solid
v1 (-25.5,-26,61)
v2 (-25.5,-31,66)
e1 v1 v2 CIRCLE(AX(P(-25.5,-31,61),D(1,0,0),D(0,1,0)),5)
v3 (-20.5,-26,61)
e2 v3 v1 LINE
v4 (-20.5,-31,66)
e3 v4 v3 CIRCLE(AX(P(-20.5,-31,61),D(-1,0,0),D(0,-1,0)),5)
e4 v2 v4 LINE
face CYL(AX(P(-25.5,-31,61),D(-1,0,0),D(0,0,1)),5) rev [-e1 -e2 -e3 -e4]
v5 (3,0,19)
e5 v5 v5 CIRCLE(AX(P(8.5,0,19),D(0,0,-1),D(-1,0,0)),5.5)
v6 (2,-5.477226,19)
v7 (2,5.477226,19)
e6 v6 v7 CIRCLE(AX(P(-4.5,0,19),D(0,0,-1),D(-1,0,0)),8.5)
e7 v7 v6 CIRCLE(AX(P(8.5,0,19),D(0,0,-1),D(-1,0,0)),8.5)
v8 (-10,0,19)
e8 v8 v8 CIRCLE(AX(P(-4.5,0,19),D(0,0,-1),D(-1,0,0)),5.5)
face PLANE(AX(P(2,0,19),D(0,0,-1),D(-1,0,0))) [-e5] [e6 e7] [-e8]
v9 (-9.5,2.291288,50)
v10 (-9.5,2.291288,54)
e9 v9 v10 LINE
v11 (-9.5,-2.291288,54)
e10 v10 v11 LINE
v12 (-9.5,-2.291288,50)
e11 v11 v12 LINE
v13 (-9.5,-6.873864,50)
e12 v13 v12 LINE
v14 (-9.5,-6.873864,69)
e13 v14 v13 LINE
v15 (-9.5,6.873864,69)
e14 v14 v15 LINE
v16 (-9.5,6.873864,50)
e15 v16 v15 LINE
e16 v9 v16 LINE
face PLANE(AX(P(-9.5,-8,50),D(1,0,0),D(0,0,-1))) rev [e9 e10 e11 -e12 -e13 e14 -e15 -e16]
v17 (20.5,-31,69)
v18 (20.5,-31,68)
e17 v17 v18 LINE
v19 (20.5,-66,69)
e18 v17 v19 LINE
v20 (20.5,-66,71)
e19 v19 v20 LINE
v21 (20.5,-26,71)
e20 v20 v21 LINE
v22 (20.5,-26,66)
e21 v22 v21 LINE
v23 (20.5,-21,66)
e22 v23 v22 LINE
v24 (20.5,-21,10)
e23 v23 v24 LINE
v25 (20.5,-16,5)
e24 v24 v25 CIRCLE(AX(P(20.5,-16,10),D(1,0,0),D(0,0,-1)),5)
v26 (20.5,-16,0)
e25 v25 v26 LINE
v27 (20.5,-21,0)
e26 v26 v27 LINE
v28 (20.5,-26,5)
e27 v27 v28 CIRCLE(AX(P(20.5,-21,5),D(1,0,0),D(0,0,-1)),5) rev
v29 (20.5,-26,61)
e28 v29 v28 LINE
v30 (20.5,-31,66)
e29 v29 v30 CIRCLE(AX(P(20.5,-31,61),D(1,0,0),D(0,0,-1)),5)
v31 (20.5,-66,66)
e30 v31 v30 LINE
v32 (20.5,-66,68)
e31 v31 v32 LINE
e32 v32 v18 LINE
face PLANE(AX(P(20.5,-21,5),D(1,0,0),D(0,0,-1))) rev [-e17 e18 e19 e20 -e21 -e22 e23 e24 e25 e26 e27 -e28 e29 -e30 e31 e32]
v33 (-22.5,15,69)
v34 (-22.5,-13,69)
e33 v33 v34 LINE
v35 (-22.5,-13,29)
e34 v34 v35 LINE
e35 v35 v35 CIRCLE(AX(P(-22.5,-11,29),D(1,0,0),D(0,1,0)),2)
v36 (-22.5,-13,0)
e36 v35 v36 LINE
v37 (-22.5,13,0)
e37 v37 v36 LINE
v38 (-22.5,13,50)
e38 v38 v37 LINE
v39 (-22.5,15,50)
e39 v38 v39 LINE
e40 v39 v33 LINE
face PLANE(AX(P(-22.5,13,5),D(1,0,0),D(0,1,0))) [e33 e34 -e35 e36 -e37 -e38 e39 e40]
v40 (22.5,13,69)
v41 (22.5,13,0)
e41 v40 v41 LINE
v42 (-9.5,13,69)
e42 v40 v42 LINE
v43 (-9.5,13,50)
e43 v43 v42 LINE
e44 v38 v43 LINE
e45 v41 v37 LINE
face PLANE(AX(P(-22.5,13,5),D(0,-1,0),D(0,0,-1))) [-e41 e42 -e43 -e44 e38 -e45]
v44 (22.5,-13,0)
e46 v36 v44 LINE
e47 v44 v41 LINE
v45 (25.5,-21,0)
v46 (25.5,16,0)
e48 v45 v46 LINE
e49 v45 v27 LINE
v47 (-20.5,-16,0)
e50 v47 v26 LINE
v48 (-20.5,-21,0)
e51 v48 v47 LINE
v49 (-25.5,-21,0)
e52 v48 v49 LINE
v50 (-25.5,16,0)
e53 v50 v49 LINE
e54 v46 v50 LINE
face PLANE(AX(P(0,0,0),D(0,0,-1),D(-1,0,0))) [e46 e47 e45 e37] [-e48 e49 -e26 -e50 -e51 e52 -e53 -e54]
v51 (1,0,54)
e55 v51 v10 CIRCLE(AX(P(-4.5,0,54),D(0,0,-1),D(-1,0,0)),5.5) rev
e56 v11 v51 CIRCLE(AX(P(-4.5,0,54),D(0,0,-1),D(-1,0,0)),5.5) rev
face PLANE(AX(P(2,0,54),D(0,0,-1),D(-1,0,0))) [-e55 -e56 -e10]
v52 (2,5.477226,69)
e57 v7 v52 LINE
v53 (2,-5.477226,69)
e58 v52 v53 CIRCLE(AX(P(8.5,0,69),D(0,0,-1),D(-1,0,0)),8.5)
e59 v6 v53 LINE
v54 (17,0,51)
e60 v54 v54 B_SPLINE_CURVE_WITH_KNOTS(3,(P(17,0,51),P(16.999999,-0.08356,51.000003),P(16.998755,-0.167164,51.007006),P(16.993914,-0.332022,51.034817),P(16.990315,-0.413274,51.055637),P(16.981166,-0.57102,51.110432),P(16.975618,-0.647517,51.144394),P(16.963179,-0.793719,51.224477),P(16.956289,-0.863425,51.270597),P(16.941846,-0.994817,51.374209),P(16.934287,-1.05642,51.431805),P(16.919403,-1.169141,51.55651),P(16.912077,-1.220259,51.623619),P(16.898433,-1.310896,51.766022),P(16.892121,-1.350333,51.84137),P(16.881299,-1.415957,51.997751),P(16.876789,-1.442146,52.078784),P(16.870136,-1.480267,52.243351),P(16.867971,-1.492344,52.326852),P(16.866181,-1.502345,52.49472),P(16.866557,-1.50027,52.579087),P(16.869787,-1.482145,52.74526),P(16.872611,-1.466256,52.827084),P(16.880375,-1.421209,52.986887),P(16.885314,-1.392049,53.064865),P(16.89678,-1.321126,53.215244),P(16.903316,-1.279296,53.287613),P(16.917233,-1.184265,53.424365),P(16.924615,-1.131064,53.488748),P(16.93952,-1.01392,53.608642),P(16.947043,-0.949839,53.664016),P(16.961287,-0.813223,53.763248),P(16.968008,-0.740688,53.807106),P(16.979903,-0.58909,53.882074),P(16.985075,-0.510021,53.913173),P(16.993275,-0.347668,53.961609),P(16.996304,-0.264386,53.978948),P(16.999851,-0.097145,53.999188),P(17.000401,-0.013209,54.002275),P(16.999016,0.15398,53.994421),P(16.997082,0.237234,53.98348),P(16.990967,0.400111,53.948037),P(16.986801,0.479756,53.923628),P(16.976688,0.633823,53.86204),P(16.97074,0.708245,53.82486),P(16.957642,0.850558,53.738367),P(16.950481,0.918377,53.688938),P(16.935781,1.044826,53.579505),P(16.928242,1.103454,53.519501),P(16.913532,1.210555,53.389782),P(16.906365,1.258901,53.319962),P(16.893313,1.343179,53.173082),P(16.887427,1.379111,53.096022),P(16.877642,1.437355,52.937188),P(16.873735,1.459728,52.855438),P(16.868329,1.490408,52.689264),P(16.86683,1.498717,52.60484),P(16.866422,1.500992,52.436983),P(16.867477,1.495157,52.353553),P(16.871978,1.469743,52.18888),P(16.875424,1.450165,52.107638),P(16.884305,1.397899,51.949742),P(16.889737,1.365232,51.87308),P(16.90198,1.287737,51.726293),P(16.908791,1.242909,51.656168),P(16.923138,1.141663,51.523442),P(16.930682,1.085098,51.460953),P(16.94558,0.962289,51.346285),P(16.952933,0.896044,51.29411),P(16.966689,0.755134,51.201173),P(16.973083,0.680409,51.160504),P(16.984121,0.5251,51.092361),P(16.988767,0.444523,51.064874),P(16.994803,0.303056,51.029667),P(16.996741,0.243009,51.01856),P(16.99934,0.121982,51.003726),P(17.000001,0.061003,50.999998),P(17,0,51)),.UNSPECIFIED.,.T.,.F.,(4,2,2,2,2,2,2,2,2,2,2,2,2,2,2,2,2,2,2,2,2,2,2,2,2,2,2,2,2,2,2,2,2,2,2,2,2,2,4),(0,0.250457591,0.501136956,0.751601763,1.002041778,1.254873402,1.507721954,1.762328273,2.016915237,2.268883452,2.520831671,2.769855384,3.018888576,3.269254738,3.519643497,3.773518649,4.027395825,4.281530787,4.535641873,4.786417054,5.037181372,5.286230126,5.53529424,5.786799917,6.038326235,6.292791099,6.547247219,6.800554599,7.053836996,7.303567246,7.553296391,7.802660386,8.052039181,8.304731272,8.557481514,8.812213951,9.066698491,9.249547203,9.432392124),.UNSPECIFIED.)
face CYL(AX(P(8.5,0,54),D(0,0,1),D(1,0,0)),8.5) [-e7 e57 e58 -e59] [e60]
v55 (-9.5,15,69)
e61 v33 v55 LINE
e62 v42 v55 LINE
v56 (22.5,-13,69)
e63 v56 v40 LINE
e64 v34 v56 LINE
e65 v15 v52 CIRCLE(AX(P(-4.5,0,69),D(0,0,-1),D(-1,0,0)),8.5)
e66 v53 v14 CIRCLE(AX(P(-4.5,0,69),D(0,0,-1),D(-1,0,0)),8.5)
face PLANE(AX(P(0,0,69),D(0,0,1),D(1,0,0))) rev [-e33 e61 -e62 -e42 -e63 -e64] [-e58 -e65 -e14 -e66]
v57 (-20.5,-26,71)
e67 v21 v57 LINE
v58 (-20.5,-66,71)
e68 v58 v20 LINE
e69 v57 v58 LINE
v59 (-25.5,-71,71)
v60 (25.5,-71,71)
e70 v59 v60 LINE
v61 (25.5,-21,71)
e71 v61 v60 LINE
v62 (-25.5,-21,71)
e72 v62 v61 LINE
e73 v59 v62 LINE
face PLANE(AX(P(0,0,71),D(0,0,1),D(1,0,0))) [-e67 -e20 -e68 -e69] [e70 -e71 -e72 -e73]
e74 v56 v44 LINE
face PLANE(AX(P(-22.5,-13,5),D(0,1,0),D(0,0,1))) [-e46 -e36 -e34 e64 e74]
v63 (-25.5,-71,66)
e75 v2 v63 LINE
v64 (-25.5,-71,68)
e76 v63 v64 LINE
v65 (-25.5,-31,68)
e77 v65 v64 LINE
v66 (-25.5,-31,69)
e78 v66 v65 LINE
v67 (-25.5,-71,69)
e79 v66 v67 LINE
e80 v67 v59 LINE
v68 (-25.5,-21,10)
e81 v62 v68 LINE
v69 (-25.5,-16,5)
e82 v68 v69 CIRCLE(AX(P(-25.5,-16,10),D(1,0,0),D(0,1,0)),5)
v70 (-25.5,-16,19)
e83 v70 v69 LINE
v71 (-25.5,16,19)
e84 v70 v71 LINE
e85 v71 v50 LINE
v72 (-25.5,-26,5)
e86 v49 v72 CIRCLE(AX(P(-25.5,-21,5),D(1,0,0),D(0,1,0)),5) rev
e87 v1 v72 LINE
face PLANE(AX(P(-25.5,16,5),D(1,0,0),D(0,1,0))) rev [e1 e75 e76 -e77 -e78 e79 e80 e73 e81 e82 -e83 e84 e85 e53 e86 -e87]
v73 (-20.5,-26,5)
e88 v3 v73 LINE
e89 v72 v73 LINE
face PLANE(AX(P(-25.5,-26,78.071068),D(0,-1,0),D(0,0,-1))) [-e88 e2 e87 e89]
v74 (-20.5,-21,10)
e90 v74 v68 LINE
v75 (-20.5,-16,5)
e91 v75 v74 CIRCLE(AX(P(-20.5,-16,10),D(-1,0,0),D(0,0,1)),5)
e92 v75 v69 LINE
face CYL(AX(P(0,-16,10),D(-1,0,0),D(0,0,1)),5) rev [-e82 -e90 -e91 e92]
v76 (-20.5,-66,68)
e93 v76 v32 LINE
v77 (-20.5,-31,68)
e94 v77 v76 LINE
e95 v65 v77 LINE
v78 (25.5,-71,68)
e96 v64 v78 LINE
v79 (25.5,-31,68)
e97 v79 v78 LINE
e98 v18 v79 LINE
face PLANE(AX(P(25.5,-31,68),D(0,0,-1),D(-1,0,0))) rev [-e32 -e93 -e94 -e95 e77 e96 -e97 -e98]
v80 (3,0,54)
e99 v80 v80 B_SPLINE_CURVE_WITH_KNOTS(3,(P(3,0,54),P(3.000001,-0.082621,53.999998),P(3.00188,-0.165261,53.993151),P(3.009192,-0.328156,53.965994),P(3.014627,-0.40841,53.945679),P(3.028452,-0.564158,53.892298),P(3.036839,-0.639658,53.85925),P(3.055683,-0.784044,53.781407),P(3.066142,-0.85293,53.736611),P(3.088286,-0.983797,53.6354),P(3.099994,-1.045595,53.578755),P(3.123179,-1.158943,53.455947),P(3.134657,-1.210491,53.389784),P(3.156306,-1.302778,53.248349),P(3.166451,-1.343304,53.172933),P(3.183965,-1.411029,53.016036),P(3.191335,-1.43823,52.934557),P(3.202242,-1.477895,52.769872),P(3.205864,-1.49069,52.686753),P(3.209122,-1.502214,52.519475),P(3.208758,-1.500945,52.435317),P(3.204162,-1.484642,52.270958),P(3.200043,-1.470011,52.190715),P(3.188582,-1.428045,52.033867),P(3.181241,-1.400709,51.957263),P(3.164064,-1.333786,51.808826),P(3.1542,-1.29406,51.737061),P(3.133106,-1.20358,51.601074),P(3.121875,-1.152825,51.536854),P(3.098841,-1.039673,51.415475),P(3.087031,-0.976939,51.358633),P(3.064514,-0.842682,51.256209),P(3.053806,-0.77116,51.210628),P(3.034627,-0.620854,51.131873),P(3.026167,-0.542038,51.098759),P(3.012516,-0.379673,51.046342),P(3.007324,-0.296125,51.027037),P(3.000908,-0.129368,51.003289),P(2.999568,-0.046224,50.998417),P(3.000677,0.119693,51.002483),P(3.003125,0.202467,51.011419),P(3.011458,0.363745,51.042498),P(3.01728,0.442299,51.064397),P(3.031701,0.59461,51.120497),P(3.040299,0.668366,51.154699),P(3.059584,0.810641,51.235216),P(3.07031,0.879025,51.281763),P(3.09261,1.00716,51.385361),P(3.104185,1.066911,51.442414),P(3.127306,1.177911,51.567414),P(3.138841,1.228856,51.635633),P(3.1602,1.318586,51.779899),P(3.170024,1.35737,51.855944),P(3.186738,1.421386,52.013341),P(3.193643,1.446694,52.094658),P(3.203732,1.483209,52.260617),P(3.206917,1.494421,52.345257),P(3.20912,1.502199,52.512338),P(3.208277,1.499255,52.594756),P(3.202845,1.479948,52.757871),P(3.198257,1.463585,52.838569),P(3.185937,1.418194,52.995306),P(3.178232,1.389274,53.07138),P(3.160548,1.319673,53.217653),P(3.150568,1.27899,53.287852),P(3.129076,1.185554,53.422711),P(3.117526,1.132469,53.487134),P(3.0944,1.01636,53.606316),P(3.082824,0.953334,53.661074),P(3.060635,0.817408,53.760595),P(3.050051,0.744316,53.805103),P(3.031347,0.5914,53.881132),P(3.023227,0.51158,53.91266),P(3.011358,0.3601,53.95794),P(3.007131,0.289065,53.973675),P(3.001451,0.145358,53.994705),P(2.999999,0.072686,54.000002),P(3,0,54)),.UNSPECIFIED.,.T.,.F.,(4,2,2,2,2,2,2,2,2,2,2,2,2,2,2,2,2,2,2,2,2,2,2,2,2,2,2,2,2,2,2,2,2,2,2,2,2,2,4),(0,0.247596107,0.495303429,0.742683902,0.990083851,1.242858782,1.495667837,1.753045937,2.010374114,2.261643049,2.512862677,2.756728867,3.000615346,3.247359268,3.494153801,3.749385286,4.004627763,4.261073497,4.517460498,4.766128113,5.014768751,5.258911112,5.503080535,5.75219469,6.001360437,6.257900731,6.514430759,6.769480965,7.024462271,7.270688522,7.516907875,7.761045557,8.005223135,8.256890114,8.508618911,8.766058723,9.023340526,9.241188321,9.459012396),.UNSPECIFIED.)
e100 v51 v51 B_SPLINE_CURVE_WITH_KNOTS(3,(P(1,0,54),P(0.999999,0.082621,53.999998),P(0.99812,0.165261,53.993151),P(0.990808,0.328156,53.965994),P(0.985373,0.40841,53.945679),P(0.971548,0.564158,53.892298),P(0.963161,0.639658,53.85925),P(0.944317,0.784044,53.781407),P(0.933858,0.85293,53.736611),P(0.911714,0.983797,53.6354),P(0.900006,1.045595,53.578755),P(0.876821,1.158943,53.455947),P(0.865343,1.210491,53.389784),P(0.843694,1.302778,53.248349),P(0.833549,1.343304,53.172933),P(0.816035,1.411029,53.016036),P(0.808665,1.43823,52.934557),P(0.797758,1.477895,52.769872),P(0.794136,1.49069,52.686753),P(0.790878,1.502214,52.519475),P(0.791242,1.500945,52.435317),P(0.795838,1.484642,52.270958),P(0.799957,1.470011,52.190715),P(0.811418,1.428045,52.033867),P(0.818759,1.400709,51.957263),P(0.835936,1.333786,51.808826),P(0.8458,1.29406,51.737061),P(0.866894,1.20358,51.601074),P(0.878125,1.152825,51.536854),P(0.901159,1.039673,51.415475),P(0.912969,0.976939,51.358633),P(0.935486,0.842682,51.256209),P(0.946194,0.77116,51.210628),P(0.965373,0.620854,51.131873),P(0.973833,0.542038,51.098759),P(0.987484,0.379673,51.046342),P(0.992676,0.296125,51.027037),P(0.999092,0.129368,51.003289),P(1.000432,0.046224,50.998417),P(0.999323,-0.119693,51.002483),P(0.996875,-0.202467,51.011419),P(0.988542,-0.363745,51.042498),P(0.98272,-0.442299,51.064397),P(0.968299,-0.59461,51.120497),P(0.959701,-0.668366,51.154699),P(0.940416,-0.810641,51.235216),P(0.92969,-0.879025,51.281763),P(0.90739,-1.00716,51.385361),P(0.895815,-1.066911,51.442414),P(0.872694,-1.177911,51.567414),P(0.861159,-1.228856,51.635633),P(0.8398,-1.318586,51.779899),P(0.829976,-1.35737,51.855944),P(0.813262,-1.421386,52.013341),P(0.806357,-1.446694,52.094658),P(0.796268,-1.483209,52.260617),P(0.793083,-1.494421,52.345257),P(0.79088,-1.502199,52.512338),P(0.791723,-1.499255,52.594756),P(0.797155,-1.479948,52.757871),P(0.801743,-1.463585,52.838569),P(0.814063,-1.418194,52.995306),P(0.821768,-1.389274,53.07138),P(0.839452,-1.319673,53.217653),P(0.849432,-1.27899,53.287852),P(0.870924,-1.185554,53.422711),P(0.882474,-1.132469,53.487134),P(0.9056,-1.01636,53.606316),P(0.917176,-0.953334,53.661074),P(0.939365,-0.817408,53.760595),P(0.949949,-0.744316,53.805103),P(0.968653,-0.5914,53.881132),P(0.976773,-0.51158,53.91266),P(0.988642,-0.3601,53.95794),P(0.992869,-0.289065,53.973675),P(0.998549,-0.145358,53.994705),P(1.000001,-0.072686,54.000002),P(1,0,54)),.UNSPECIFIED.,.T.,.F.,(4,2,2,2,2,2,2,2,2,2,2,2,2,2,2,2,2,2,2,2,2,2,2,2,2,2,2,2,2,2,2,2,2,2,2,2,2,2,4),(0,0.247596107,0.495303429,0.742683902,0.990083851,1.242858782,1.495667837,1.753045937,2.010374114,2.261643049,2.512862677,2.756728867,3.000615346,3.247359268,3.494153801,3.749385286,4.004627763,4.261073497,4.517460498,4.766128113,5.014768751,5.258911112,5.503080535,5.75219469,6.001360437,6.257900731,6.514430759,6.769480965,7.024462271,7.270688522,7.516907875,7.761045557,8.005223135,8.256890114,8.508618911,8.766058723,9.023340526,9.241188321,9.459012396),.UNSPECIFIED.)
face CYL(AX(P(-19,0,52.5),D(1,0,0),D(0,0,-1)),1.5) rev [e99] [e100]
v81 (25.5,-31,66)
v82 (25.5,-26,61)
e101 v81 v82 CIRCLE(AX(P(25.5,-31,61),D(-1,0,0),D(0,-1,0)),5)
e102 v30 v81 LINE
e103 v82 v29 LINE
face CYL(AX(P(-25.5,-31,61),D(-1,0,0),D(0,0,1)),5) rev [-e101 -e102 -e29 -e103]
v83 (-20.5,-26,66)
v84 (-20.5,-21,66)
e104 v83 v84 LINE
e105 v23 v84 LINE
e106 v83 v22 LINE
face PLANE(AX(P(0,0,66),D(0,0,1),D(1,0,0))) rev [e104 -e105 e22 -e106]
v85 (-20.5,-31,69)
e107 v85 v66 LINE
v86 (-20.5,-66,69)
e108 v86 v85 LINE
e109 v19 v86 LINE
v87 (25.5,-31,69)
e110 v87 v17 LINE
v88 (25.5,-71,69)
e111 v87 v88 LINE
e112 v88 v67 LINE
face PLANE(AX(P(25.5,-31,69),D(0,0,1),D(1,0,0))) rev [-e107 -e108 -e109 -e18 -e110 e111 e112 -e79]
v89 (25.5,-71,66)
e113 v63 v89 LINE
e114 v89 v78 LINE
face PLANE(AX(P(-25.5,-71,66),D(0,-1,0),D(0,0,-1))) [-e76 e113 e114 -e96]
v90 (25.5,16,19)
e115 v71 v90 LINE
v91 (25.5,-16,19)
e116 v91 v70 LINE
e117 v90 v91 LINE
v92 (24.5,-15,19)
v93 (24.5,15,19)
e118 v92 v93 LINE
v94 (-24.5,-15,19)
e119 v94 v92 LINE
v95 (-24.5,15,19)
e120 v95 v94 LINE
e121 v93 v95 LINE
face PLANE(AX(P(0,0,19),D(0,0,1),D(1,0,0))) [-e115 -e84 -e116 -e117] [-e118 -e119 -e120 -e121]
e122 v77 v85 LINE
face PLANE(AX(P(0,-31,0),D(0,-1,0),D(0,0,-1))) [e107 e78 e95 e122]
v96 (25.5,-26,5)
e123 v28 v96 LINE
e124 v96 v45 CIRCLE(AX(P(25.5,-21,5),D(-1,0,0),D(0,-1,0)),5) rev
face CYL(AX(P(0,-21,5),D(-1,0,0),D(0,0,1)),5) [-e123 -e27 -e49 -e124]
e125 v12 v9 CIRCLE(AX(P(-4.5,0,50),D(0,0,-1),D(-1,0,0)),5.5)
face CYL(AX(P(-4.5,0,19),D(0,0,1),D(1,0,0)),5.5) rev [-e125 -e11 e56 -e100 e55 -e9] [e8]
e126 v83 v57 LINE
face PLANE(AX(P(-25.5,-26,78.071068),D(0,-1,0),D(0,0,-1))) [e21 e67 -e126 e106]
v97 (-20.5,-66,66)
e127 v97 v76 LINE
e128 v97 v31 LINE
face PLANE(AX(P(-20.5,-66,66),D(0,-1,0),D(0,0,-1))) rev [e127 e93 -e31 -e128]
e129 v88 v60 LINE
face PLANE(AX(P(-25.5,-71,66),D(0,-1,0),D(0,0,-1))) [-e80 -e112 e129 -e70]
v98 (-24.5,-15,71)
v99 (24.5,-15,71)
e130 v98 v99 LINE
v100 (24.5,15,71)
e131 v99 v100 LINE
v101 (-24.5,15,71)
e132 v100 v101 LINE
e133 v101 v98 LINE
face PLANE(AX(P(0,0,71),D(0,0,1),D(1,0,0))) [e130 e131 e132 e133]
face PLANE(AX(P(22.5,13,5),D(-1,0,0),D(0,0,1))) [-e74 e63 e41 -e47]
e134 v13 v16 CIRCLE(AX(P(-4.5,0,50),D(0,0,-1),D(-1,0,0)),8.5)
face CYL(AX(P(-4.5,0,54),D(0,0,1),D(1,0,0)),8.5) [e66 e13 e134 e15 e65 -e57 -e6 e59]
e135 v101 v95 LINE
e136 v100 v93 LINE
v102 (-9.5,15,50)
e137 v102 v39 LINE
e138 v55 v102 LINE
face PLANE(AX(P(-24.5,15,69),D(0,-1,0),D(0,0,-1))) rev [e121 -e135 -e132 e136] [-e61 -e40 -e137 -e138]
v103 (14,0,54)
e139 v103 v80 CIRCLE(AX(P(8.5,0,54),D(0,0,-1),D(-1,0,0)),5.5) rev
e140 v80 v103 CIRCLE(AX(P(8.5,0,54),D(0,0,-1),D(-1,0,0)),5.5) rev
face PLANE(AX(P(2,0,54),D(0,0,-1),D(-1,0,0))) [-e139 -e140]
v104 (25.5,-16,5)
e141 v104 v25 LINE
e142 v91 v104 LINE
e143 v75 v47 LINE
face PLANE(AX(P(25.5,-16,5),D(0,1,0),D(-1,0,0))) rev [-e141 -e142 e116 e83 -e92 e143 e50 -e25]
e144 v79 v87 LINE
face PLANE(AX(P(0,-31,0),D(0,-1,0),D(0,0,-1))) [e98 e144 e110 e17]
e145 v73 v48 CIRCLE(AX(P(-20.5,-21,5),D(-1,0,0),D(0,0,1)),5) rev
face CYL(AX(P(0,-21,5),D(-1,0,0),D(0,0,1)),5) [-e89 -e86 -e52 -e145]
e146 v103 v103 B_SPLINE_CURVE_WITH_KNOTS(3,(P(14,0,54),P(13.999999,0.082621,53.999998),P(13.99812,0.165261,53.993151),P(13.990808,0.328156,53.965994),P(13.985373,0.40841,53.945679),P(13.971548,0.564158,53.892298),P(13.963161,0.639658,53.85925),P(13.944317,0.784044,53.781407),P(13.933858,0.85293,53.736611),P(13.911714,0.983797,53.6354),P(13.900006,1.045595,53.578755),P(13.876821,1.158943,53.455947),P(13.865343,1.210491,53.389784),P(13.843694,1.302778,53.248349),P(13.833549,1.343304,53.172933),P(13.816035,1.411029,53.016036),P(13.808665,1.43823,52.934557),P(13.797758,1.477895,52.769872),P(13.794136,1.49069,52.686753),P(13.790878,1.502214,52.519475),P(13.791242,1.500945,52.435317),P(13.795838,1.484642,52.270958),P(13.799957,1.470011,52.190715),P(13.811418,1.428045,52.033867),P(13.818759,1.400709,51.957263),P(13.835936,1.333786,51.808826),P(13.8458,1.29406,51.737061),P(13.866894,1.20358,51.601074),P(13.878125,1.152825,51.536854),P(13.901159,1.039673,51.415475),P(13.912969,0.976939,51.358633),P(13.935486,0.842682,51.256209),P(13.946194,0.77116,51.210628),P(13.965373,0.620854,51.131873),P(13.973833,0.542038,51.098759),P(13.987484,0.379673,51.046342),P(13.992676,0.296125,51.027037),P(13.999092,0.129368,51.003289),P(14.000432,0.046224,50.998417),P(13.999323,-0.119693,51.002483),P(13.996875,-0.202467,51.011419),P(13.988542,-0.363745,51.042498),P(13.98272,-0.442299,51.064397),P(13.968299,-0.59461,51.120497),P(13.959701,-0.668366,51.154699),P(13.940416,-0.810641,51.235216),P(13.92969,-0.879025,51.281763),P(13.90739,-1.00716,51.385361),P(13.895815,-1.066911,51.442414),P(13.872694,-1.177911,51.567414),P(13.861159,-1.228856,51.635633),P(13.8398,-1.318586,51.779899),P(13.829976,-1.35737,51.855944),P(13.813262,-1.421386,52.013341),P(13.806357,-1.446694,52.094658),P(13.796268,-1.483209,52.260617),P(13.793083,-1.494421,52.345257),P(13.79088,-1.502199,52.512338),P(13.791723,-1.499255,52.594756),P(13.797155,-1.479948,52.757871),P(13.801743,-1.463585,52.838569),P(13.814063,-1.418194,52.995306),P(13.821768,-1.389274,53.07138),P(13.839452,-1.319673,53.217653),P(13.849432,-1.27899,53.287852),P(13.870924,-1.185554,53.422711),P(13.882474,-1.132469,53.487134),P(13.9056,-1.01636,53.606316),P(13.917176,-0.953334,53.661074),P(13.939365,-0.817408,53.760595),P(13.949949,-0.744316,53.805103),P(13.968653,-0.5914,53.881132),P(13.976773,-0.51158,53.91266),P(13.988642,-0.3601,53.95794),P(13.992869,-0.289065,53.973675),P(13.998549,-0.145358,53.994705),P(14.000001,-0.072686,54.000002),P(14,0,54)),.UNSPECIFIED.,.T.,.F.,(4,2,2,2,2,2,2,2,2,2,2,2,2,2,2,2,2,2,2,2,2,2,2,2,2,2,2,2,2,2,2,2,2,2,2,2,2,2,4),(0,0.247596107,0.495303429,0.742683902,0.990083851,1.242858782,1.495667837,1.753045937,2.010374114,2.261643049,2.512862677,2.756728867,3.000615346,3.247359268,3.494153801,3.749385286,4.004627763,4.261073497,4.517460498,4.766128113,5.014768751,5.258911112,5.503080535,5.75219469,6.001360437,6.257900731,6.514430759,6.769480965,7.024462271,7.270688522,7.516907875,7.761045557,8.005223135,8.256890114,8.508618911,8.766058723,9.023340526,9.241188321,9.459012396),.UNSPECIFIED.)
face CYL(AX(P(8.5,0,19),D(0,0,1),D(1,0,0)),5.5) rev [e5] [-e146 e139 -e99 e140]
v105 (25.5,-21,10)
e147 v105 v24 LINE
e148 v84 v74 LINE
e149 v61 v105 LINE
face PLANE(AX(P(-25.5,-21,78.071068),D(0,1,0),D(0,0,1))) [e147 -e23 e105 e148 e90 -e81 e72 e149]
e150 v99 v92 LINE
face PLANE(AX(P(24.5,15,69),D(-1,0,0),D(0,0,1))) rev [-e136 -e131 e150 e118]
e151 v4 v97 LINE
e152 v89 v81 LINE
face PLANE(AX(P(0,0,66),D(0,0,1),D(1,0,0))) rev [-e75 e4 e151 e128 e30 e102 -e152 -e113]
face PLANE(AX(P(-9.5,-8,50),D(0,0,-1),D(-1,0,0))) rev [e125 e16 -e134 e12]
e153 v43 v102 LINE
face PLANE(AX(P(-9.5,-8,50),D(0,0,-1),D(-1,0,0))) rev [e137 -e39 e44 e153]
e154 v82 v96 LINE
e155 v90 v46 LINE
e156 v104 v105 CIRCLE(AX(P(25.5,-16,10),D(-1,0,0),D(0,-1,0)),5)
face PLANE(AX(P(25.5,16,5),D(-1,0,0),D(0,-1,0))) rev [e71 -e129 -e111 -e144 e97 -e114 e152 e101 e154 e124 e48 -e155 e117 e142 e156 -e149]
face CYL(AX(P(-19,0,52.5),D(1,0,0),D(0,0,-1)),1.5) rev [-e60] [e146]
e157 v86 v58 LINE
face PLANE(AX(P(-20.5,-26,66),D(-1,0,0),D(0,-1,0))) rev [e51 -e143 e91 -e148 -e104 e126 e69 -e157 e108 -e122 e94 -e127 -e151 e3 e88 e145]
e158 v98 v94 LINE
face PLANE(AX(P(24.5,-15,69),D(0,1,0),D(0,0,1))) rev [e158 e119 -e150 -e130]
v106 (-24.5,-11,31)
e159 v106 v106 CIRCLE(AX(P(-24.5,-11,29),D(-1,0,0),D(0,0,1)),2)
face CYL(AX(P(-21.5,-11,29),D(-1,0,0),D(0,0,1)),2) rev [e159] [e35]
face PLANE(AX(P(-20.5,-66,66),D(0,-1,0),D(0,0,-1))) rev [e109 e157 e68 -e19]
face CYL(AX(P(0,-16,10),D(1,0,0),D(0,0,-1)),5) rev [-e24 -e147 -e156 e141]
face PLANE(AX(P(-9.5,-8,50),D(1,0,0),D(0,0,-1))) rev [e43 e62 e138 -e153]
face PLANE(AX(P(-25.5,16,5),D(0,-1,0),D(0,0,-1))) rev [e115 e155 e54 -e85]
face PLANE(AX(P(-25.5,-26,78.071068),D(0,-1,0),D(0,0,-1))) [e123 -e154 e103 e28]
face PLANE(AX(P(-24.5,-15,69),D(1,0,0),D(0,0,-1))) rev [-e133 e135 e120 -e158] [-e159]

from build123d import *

# Parameters (mm, degrees)
ESBO_O1_W                 = 45
ESBO_O1_H                 = 26
RESSALTO_EXTRUS_O1_DEPTH  = 5
RESSALTO_EXTRUS_O4_START  = -5
ESBO_O6_W                 = 51
ESBO_O6_H                 = 32
ESBO_O6_W_2               = 45
ESBO_O6_H_2               = 26
RESSALTO_EXTRUS_O4_DEPTH  = 14
ESBO_O7_W                 = 49
ESBO_O7_H                 = 30
ESBO_O7_W_2               = 45
ESBO_O7_H_2               = 26
RESSALTO_EXTRUS_O5_DEPTH  = 50
ESBO_O8_W                 = 49
ESBO_O8_H                 = 30
RESSALTO_EXTRUS_O6_DEPTH  = 2
RESSALTO_EXTRUS_O9_DEPTH  = 15
ESBO_O11_R                = 5.5
RESSALTO_EXTRUS_O10_DEPTH = 35
ESBO_O9_W                 = 13
ESBO_O9_H                 = 19
CORTE_EXTRUS_O2_DEPTH     = 23
ESBO_O12_W                = 5
ESBO_O12_H                = 5
RESSALTO_EXTRUS_O11_DEPTH = 5
ESBO_O13_W                = 5
ESBO_O13_H                = 5
RESSALTO_EXTRUS_O12_DEPTH = 71
ESBO_O14_W                = 51
ESBO_O14_H                = 5
RESSALTO_EXTRUS_O13_DEPTH = 5
ESBO_O16_R                = 2
CORTE_EXTRUS_O4_DEPTH     = 3
ESBO_O17_R                = 1.5
CORTE_EXTRUS_O5_DEPTH     = 19
ESBO_O18_W                = 51
ESBO_O18_H                = 50
ESBO_O18_W_2              = 41
ESBO_O18_H_2              = 40
RESSALTO_EXTRUS_O14_DEPTH = 5
FILETE3_R                 = 5
ESBO_O19_W                = 51
ESBO_O19_H                = 1
CORTE_EXTRUS_O6_DEPTH     = 40


with BuildPart() as part:
    # Esboço1 → Ressalto-extrusão1 (new body)
    with BuildSketch(Plane.XY):
        Polygon((-25.5, 16), (-25.5, -16), (-22.5, -16), (22.5, -16), (25.5, -16), (25.5, 16), align=None)
        Rectangle(ESBO_O1_W, ESBO_O1_H, mode=Mode.SUBTRACT)
    extrude(amount=RESSALTO_EXTRUS_O1_DEPTH)

    # Esboço6 → Ressalto-extrusão4 (add)
    with BuildSketch(Plane(origin=(0, 0, 0), x_dir=(-1, 0, 0), z_dir=(0, 0, -1)).offset(RESSALTO_EXTRUS_O4_START)):
        Rectangle(ESBO_O6_W, ESBO_O6_H)
        Rectangle(ESBO_O6_W_2, ESBO_O6_H_2, mode=Mode.SUBTRACT)
    extrude(amount=-RESSALTO_EXTRUS_O4_DEPTH)

    # Esboço7 → Ressalto-extrusão5 (add)
    with BuildSketch(Plane.XY.offset(19)):
        Rectangle(ESBO_O7_W, ESBO_O7_H)
        Rectangle(ESBO_O7_W_2, ESBO_O7_H_2, mode=Mode.SUBTRACT)
    extrude(amount=RESSALTO_EXTRUS_O5_DEPTH)

    # Esboço8 → Ressalto-extrusão6 (add)
    with BuildSketch(Plane.XY.offset(69)):
        Rectangle(ESBO_O8_W, ESBO_O8_H)
    extrude(amount=RESSALTO_EXTRUS_O6_DEPTH)

    # Esboço10 → Ressalto-extrusão9 (add)
    with BuildSketch(Plane(origin=(0, 0, 69), x_dir=(-1, 0, 0), z_dir=(0, 0, -1))):
        with BuildLine():
            ThreePointArc((-2, 5.477225575), (-17, 0), (-2, -5.477225575))
            ThreePointArc((-2, -5.477225575), (13, 0), (-2, 5.477225575))
        make_face()
    extrude(amount=RESSALTO_EXTRUS_O9_DEPTH)

    # Esboço11 → Ressalto-extrusão10 (add)
    with BuildSketch(Plane(origin=(0, 0, 54), x_dir=(-1, 0, 0), z_dir=(0, 0, -1))):
        with BuildLine():
            ThreePointArc((-2, -5.477225575), (13, 0), (-2, 5.477225575))
            ThreePointArc((-2, 5.477225575), (-17, 0), (-2, -5.477225575))
        make_face()
        with Locations((-8.5, 0)):
            Circle(ESBO_O11_R, mode=Mode.SUBTRACT)
        with Locations((4.5, 0)):
            Circle(ESBO_O11_R, mode=Mode.SUBTRACT)
    extrude(amount=RESSALTO_EXTRUS_O10_DEPTH)

    # Esboço9 → Corte-extrusão2 (cut)
    with BuildSketch(Plane(origin=(0, 15, 0), x_dir=(1, 0, 0), z_dir=(0, 1, 0))):
        with Locations((-16, -59.5)):
            Rectangle(ESBO_O9_W, ESBO_O9_H)
    extrude(amount=-CORTE_EXTRUS_O2_DEPTH, mode=Mode.SUBTRACT)

    # Esboço12 → Ressalto-extrusão11 (add)
    with BuildSketch(Plane.XY):
        with Locations((23, -18.5)):
            Rectangle(ESBO_O12_W, ESBO_O12_H)
        with Locations((-23, -18.5)):
            Rectangle(ESBO_O12_W, ESBO_O12_H)
    extrude(amount=RESSALTO_EXTRUS_O11_DEPTH)

    # Esboço13 → Ressalto-extrusão12 (add)
    with BuildSketch(Plane(origin=(0, 0, 0), x_dir=(-1, 0, 0), z_dir=(0, 0, -1))):
        with Locations((23, -23.5)):
            Rectangle(ESBO_O13_W, ESBO_O13_H)
        with Locations((-23, -23.5)):
            Rectangle(ESBO_O13_W, ESBO_O13_H)
    extrude(amount=-RESSALTO_EXTRUS_O12_DEPTH)

    # Esboço14 → Ressalto-extrusão13 (add)
    with BuildSketch(Plane.XY.offset(71)):
        with Locations((0, -23.5)):
            Rectangle(ESBO_O14_W, ESBO_O14_H)
    extrude(amount=-RESSALTO_EXTRUS_O13_DEPTH)

    # Esboço16 → Corte-extrusão4 (cut)
    with BuildSketch(Plane.ZY.offset(24.5)):
        with Locations((29, -11)):
            Circle(ESBO_O16_R)
    extrude(amount=-CORTE_EXTRUS_O4_DEPTH, mode=Mode.SUBTRACT)

    # Esboço17 → Corte-extrusão5 (cut, symmetric)
    with BuildSketch(Plane(origin=(0, 0, 0), x_dir=(0, 0, -1), z_dir=(1, 0, 0))):
        with Locations((-52.5, 0)):
            Circle(ESBO_O17_R)
    extrude(amount=CORTE_EXTRUS_O5_DEPTH, both=True, mode=Mode.SUBTRACT)

    # Esboço18 → Ressalto-extrusão14 (add)
    with BuildSketch(Plane.XY.offset(71)):
        with Locations((0, -46)):
            Rectangle(ESBO_O18_W, ESBO_O18_H)
        with Locations((0, -46)):
            Rectangle(ESBO_O18_W_2, ESBO_O18_H_2, mode=Mode.SUBTRACT)
    extrude(amount=-RESSALTO_EXTRUS_O14_DEPTH)

    # Filete3
    # the kernel refuses this fillet: 5 mm, written as the material it adds along each edge
    with BuildSketch(Plane(origin=(20.5, -21, 5), x_dir=(0, 1, 0), z_dir=(1, 0, 0)), Plane(origin=(-20.5, -21, 5), x_dir=(0, 0, 1), z_dir=(-1, 0, 0)), Plane(origin=(25.5, -26, 66), x_dir=(0, 0, -1), z_dir=(-1, 0, 0)), Plane(origin=(-20.5, -26, 66), x_dir=(0, 0, -1), z_dir=(-1, 0, 0))) as filete3_piece_1:
        with BuildLine():
            CenterArc((FILETE3_R, FILETE3_R), FILETE3_R, 180, 90)
            Line((0, FILETE3_R), (0, 0))
            Line((0, 0), (FILETE3_R, 0))
        make_face()
    extrude(amount=5)
    # the kernel refuses this fillet: 5 mm, written as the material it takes off along each edge
    with BuildSketch(Plane(origin=(-38, -26, 0), x_dir=(0, 0, 1), z_dir=(1, 0, 0))) as filete3_2_piece_1:
        with BuildLine():
            CenterArc((FILETE3_R, -FILETE3_R), FILETE3_R, 90, 90)
            Line((0, -FILETE3_R), (0, 0))
            Line((0, 0), (FILETE3_R, 0))
        make_face()
    extrude(amount=30, mode=Mode.SUBTRACT)
    with BuildSketch(Plane(origin=(8, -26, 0), x_dir=(0, 1, 0), z_dir=(1, 0, 0))) as filete3_2_piece_2:
        with BuildLine():
            CenterArc((FILETE3_R, FILETE3_R), FILETE3_R, 180, 90)
            Line((0, FILETE3_R), (0, 0))
            Line((0, 0), (FILETE3_R, 0))
        make_face()
    extrude(amount=30, mode=Mode.SUBTRACT)

    # Esboço19 → Corte-extrusão6 (cut)
    with BuildSketch(Plane.XZ.offset(71)):
        with Locations((0, 68.5)):
            Rectangle(ESBO_O19_W, ESBO_O19_H)
    extrude(amount=-CORTE_EXTRUS_O6_DEPTH, mode=Mode.SUBTRACT)


solid = part.part
